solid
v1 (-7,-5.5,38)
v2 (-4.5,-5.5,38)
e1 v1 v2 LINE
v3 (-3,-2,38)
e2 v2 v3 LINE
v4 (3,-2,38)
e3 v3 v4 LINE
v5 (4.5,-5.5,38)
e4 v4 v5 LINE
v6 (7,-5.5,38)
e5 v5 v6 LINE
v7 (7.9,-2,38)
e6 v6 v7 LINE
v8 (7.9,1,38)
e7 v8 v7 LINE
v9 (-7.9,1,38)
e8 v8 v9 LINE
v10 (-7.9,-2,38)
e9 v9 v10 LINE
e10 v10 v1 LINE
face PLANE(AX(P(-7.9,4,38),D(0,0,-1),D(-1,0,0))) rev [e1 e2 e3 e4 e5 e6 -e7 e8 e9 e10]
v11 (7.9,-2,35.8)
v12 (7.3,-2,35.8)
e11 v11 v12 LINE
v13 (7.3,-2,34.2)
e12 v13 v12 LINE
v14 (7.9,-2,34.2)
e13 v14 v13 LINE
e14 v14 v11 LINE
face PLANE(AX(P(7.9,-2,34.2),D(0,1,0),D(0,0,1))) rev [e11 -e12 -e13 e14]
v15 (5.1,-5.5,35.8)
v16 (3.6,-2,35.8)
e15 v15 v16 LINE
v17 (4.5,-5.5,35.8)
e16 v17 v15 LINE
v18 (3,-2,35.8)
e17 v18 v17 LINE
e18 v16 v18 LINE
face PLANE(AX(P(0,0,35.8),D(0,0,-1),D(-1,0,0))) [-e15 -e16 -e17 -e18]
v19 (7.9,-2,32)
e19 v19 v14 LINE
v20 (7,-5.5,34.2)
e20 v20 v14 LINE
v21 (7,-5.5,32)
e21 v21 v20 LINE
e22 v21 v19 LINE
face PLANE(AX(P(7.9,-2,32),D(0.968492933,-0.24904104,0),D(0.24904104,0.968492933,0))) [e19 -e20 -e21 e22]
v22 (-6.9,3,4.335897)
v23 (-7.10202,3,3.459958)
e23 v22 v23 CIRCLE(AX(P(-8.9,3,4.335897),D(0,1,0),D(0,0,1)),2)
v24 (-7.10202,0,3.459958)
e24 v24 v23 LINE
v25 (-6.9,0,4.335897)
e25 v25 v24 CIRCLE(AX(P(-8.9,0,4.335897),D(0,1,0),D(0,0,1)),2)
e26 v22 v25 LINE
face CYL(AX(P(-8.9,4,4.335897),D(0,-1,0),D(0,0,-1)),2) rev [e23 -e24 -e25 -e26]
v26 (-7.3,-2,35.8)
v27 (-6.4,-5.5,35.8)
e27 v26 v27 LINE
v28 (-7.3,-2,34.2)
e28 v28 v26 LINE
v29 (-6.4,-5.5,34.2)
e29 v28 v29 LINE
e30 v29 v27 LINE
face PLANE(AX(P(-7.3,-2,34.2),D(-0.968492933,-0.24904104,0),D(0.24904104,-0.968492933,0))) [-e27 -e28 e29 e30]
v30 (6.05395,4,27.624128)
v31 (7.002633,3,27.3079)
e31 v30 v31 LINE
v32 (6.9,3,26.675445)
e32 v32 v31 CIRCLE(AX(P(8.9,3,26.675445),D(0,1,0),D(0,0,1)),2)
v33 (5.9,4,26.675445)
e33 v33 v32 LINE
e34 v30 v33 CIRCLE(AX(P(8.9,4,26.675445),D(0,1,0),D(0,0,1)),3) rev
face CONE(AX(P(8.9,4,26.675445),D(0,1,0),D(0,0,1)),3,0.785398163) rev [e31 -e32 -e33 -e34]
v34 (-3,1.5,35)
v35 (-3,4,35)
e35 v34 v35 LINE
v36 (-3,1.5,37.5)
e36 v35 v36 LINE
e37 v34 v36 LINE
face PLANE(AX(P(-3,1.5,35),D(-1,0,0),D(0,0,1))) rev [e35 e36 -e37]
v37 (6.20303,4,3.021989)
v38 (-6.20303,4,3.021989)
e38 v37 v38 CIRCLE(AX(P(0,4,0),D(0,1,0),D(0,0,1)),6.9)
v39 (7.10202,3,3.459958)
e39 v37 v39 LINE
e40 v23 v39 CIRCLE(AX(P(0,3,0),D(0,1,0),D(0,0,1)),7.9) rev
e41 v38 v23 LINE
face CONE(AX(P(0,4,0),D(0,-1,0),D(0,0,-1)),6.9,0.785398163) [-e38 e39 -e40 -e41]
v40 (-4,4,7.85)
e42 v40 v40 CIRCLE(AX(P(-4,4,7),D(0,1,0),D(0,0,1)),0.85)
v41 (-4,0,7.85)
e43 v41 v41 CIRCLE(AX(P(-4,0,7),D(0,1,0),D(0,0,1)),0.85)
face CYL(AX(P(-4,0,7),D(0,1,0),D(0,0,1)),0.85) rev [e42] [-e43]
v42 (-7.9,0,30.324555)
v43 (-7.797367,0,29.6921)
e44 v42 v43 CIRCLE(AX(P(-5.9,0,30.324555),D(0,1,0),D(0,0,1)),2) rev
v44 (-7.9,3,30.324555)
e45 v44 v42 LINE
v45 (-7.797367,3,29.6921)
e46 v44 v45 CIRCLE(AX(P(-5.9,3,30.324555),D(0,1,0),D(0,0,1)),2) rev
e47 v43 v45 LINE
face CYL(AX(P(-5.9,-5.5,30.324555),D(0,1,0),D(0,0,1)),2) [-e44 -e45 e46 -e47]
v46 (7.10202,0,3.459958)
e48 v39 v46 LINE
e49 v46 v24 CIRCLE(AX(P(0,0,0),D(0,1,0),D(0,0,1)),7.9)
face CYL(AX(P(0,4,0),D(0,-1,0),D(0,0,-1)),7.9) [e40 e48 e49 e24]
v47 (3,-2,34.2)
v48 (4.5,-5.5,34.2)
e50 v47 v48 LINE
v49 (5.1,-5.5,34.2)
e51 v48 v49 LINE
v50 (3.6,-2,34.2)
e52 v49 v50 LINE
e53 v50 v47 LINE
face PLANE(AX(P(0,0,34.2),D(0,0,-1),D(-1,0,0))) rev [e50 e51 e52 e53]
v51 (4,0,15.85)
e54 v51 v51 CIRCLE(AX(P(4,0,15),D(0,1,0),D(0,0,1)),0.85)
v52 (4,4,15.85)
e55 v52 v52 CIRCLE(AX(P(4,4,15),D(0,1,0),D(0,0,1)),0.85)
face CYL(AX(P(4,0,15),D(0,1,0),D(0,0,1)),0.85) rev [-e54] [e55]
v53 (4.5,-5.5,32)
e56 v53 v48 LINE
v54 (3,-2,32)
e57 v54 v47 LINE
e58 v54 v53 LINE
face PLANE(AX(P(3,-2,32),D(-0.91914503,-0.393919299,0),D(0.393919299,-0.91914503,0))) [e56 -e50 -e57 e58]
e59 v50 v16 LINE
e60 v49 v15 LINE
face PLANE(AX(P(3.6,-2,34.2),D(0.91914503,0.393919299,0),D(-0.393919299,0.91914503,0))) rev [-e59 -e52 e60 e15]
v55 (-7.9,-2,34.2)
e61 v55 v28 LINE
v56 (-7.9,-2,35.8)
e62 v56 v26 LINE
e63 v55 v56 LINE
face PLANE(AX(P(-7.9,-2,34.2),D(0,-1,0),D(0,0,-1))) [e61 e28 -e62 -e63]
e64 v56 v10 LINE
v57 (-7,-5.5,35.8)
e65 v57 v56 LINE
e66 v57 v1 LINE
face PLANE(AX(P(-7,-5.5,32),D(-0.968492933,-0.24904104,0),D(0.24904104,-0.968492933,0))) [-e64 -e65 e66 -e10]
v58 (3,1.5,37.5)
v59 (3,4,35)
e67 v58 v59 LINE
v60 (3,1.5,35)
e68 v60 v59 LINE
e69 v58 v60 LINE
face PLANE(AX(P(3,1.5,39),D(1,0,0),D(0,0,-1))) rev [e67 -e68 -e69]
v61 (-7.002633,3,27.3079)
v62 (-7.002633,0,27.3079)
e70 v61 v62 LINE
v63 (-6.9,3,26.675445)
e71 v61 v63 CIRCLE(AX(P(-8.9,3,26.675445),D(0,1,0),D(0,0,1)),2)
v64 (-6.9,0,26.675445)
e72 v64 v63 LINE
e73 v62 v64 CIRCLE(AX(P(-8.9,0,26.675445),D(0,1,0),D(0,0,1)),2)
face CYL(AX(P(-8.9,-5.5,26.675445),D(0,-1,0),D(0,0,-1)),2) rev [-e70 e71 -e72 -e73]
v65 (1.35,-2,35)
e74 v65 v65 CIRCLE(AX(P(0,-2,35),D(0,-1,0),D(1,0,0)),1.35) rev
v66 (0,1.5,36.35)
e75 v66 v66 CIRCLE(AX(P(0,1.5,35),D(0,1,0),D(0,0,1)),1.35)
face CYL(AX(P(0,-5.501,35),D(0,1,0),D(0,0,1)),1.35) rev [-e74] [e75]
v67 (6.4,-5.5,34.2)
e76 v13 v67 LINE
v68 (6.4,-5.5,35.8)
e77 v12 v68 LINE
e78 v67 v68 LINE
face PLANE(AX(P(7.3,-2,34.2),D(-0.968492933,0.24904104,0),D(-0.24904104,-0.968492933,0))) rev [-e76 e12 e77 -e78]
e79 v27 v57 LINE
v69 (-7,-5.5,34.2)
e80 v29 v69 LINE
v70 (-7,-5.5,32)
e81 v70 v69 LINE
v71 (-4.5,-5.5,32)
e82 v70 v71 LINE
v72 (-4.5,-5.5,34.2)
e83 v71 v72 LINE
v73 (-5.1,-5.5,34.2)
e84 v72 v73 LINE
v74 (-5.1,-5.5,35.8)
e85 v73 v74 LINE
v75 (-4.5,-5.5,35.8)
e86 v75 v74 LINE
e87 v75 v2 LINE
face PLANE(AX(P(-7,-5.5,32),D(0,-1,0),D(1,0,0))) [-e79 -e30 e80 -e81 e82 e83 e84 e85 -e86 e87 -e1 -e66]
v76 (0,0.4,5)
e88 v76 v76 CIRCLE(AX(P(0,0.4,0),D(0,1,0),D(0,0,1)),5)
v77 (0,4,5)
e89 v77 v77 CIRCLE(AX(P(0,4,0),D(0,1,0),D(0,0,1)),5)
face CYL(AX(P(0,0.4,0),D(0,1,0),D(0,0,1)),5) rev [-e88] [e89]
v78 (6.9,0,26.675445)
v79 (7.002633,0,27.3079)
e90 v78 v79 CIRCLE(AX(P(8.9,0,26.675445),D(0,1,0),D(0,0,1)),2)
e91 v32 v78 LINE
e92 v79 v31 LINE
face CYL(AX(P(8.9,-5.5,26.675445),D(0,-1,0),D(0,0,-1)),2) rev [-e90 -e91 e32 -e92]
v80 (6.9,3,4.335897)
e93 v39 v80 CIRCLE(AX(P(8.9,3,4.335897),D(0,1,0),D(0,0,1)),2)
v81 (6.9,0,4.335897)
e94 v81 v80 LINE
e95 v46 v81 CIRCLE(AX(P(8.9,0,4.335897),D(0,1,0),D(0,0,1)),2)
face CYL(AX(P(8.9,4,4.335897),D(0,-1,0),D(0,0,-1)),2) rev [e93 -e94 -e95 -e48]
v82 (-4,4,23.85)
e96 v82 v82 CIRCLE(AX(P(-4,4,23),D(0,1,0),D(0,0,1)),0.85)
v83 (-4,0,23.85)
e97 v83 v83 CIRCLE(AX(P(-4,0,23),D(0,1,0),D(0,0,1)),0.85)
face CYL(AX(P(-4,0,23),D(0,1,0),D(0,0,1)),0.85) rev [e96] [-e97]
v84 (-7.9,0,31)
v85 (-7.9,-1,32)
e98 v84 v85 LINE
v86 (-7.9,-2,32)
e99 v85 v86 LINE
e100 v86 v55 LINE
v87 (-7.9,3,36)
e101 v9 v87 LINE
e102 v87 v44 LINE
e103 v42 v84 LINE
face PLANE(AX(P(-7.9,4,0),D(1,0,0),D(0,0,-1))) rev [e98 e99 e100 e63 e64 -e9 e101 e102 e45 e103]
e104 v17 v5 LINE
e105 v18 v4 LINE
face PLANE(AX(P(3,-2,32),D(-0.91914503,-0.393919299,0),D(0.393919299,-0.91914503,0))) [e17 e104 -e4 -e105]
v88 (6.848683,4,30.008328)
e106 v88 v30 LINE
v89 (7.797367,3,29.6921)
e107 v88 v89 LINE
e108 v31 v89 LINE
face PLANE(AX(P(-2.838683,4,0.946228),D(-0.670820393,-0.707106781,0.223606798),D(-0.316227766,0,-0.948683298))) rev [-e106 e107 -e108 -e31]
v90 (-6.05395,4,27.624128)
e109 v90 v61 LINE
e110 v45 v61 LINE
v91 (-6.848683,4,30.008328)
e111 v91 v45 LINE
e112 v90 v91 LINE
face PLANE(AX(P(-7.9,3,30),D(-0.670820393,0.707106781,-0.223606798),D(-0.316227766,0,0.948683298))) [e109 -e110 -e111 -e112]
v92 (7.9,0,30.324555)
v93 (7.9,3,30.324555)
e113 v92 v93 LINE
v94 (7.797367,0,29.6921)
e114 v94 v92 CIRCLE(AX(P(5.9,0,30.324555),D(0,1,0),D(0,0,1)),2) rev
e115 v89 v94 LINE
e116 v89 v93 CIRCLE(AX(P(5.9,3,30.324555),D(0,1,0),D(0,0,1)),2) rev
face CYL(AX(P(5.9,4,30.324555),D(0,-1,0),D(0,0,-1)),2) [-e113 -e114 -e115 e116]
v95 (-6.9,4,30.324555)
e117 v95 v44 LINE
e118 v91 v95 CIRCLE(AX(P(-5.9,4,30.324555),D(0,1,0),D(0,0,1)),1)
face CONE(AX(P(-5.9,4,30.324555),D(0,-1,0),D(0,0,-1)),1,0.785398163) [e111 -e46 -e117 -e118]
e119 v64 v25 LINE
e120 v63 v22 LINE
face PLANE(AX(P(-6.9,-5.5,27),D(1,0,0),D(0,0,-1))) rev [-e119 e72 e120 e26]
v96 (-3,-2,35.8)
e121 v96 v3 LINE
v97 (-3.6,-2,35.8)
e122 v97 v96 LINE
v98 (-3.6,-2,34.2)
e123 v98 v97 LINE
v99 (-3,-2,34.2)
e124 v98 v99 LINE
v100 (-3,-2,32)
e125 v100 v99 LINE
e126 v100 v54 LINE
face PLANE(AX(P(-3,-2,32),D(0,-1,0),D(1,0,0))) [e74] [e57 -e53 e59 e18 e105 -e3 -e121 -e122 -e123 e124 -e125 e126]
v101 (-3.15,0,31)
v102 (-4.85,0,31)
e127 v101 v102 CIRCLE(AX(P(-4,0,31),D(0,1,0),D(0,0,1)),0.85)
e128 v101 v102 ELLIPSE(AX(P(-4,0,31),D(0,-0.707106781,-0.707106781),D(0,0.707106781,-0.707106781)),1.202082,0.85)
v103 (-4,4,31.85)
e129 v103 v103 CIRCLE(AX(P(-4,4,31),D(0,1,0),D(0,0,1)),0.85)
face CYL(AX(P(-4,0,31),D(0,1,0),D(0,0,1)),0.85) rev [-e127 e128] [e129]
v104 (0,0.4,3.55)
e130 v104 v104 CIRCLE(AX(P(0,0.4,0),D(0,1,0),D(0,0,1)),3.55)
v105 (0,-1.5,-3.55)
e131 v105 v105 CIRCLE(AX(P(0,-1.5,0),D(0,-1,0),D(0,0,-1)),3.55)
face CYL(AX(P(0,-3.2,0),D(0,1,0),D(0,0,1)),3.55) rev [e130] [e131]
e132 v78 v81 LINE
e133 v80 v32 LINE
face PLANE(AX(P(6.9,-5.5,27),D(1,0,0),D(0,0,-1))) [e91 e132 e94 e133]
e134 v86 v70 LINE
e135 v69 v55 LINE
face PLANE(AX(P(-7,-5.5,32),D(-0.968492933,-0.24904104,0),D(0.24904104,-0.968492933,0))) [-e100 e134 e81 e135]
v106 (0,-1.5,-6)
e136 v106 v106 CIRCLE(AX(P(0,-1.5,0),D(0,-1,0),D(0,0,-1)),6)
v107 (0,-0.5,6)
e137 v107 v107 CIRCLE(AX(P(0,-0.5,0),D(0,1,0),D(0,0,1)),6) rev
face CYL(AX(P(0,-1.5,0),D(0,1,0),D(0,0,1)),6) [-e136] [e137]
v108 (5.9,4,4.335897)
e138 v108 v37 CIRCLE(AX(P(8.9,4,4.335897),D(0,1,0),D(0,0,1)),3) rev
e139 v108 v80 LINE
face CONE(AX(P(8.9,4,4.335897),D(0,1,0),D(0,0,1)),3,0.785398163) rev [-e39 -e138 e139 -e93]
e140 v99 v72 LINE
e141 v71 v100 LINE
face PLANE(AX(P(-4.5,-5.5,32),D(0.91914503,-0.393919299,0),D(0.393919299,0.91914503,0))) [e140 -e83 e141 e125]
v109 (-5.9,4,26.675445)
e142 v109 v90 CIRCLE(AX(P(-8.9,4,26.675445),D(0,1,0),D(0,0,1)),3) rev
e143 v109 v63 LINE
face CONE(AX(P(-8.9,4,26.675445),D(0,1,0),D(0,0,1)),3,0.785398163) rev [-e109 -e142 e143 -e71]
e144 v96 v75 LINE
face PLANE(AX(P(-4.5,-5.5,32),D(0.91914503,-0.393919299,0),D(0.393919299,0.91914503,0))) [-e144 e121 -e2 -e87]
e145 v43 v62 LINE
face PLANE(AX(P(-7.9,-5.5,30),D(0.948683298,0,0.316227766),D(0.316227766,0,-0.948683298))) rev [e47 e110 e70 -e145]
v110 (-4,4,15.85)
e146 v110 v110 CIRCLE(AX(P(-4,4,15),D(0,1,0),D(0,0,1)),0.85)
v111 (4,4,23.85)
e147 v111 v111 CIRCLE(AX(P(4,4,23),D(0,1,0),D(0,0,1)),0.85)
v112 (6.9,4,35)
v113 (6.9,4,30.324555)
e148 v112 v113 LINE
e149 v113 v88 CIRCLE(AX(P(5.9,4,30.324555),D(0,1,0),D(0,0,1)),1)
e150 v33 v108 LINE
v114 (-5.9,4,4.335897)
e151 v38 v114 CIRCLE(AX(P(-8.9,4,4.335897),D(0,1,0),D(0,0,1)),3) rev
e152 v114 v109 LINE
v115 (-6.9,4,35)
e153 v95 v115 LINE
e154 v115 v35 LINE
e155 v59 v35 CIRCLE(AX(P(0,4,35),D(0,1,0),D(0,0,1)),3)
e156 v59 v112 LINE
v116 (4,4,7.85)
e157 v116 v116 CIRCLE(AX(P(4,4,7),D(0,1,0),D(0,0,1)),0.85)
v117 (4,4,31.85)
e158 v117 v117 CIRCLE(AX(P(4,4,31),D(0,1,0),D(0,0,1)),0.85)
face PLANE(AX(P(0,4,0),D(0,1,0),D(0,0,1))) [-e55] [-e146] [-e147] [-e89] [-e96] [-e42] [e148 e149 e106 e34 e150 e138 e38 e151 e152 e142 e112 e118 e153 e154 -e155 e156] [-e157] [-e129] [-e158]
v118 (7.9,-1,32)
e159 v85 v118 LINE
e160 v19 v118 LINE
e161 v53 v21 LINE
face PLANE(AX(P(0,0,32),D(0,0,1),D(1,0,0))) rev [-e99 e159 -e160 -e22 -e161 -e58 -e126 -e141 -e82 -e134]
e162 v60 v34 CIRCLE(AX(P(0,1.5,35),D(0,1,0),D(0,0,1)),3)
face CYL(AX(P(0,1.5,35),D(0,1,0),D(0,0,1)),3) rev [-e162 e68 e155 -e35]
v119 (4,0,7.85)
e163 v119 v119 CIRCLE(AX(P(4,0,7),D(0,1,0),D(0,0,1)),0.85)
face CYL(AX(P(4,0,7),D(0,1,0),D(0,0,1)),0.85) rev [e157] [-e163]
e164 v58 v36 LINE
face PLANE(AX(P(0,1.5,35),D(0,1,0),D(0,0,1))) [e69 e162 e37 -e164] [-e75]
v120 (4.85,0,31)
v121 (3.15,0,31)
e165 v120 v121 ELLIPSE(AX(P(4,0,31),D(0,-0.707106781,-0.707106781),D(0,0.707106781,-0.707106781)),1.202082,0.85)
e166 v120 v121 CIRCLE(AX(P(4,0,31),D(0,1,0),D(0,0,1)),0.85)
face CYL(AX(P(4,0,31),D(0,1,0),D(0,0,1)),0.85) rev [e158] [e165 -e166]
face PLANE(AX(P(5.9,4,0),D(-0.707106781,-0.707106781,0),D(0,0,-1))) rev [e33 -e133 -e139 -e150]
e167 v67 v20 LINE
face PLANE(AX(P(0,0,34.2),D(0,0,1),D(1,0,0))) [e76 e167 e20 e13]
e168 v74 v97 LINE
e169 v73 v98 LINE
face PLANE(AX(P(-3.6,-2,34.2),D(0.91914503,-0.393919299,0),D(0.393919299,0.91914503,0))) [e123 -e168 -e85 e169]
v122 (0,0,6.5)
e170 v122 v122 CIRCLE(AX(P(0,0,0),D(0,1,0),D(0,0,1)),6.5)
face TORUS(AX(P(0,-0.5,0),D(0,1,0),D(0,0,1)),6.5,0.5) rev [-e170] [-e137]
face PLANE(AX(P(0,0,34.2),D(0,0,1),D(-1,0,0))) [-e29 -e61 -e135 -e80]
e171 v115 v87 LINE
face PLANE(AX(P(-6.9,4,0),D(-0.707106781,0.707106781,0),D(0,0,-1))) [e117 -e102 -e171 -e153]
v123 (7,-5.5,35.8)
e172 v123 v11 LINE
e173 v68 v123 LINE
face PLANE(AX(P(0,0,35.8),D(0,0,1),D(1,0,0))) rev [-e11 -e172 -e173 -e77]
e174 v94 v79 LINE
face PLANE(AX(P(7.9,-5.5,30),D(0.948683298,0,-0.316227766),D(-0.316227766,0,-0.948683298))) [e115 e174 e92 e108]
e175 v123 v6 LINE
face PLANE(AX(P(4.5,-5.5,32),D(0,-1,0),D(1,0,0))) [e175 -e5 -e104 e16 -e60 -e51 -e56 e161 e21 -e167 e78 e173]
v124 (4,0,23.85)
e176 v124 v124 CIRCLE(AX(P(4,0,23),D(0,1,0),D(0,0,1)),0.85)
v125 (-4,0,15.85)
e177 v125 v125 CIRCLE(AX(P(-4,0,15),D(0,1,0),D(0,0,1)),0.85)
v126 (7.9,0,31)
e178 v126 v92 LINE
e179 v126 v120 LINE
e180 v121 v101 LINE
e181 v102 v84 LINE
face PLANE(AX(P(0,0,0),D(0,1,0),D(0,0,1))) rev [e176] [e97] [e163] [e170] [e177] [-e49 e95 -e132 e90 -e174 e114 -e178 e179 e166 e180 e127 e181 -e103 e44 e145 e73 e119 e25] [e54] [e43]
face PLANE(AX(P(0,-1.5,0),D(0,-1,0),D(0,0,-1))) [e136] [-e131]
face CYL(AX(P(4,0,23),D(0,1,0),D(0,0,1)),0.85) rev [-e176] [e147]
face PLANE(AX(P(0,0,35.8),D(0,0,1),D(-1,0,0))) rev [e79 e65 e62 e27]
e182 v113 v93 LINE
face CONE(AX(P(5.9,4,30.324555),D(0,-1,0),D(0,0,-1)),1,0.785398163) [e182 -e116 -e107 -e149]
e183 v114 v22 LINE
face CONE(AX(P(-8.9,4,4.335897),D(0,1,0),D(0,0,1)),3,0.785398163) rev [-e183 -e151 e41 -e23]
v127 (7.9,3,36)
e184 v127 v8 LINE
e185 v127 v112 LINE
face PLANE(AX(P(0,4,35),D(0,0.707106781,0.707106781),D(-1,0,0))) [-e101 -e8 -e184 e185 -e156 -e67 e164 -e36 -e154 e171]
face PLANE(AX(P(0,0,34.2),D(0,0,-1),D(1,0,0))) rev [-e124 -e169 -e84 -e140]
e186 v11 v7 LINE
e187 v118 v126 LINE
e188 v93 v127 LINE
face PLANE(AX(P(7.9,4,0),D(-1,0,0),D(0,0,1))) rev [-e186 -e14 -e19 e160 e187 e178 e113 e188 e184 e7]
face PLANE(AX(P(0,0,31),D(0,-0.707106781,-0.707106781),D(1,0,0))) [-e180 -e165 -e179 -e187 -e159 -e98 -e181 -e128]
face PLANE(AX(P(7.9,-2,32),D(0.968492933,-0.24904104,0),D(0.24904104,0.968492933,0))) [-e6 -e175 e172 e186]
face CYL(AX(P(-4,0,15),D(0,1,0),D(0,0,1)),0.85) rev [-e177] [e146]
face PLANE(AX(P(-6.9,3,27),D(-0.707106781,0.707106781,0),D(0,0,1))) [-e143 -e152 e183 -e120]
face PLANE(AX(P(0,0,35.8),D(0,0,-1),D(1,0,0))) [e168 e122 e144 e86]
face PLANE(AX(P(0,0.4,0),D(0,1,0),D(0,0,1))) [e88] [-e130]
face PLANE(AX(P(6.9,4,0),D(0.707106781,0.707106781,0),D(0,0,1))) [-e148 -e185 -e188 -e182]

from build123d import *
from build123d.topology import SkipClean

# Parameters (mm, degrees)
EXTRUDE_1_DEPTH        = 4
EXTRUDE_3_DEPTH        = 6
CHAMFER_1_SIZE         = 3
SKETCH_5_R             = 0.85
CUT_EXTRUDE_1_DEPTH    = 4
PATTERN_LINEAR_1_COUNT = 4
PATTERN_LINEAR_1_PITCH = 8
CUT_EXTRUDE_2_DEPTH    = 2.5
CUT_EXTRUDE_3_REACH    = 41.439
SKETCH_7_R             = 1.35
SKETCH_8_R             = 6
EXTRUDE_4_DEPTH        = 1.5
FILLET_1_R             = 0.5
SKETCH_9_R             = 5
CUT_EXTRUDE_4_DEPTH    = 3.6
SKETCH_10_R            = 3.55
CUT_EXTRUDE_5_DEPTH    = 3.6
CUT_EXTRUDE_6_DEPTH    = 0.8
CUT_EXTRUDE_7_DEPTH    = 40.958228189
FILLET_2_R             = 2
CHAMFER_2_SIZE         = 1


with BuildPart() as part:
    # ｽｹｯﾁ1 → ﾎﾞｽ - 押し出し1 (new body)
    with BuildSketch(Plane(origin=(0, 0, 0), x_dir=(1, 0, 0), z_dir=(0, 1, 0))):
        with BuildLine():
            Line((-7.9, 0), (-7.9, -38))
            Line((-7.9, -38), (7.9, -38))
            Line((7.9, -38), (7.9, 0))
            ThreePointArc((7.9, 0), (0, 7.9), (-7.9, 0))
        make_face()
    extrude(amount=EXTRUDE_1_DEPTH)

    # ｽｹｯﾁ4 → ﾎﾞｽ - 押し出し3 (add)
    with BuildSketch(Plane.XY.offset(38)):
        Polygon((-7, -5.5), (-4.5, -5.5), (-3, -2), (3, -2), (4.5, -5.5), (7, -5.5), (7.9, -2), (7.9, 0), (-7.9, 0), (-7.9, -2), align=None)
    extrude(amount=-EXTRUDE_3_DEPTH)

    # 面取り1
    chamfer_1_edges = [part.edges().sort_by_distance(p)[0] for p in [
        (0, 4, 38),
    ]]
    chamfer(chamfer_1_edges, length=CHAMFER_1_SIZE)

    # ｽｹｯﾁ5 → ｶｯﾄ - 押し出し1 (cut)
    with BuildSketch(Plane(origin=(0, 4, 0), x_dir=(1, 0, 0), z_dir=(0, 1, 0))):
        with Locations(Location((-4, -31, 0), (0, 0, 270))):
            Circle(SKETCH_5_R)
        with Locations(Location((4, -31, 0), (0, 0, 270))):
            Circle(SKETCH_5_R)
    cut_extrude_1 = extrude(amount=-CUT_EXTRUDE_1_DEPTH, mode=Mode.SUBTRACT)

    # 直線ﾊﾟﾀｰﾝ1: ｶｯﾄ - 押し出し1 ×4
    with Locations(*[(0, 0, -i * PATTERN_LINEAR_1_PITCH) for i in range(1, PATTERN_LINEAR_1_COUNT)]):
        add(cut_extrude_1, mode=Mode.SUBTRACT)

    # ｽｹｯﾁ6 → ｶｯﾄ - 押し出し2 (cut)
    with BuildSketch(Plane(origin=(0, 4, 0), x_dir=(1, 0, 0), z_dir=(0, 1, 0))):
        with BuildLine():
            Line((-3, -35), (-3, -39))
            Line((-3, -39), (3, -39))
            Line((3, -39), (3, -35))
            ThreePointArc((3, -35), (0, -32), (-3, -35))
        make_face()
    extrude(amount=-CUT_EXTRUDE_2_DEPTH, mode=Mode.SUBTRACT)

    # ｽｹｯﾁ7 → ｶｯﾄ - 押し出し3 (cut, up to next)
    with BuildSketch(Plane(origin=(0, 1.5, 0), x_dir=(1, 0, 0), z_dir=(0, 1, 0)), mode=Mode.PRIVATE) as cut_extrude_3_sk1:
        with Locations(Location((0, -35, 0), (0, 0, 270))):
            Circle(SKETCH_7_R)
    cut_extrude_3_tool1 = extrude(cut_extrude_3_sk1.sketch, amount=-CUT_EXTRUDE_3_REACH, mode=Mode.PRIVATE) & part.part
    add(cut_extrude_3_tool1.solids().sort_by_distance((0, 1.5, 35))[0], mode=Mode.SUBTRACT)

    # ｽｹｯﾁ8 → ﾎﾞｽ - 押し出し4 (add)
    with BuildSketch(Plane.XZ):
        with Locations(Location((0, 0, 0), (0, 0, 90))):
            Circle(SKETCH_8_R)
    extrude(amount=EXTRUDE_4_DEPTH)

    # ﾌｨﾚｯﾄ1
    fillet_1_edges = [part.edges().sort_by_distance(p)[0] for p in [
        (0, 0, -6),
    ]]
    fillet(fillet_1_edges, radius=FILLET_1_R)

    # ｽｹｯﾁ9 → ｶｯﾄ - 押し出し4 (cut)
    with BuildSketch(Plane(origin=(0, 4, 0), x_dir=(1, 0, 0), z_dir=(0, 1, 0))):
        with Locations(Location((0, 0, 0), (0, 0, 270))):
            Circle(SKETCH_9_R)
    extrude(amount=-CUT_EXTRUDE_4_DEPTH, mode=Mode.SUBTRACT)

    # ｽｹｯﾁ10 → ｶｯﾄ - 押し出し5 (cut)
    with BuildSketch(Plane(origin=(0, 0.4, 0), x_dir=(1, 0, 0), z_dir=(0, 1, 0))):
        with Locations(Location((0, 0, 0), (0, 0, 270))):
            Circle(SKETCH_10_R)
    extrude(amount=-CUT_EXTRUDE_5_DEPTH, mode=Mode.SUBTRACT)

    # ｽｹｯﾁ11 → ｶｯﾄ - 押し出し6 (cut, symmetric)
    with BuildSketch(Plane.XY.offset(35)):
        Polygon((3, -2), (4.5, -5.5), (5.1, -5.5), (3.6, -2), align=None)
        Polygon((7.9, -2), (7, -5.5), (6.4, -5.5), (7.3, -2), align=None)
    cut_extrude_6 = extrude(amount=CUT_EXTRUDE_6_DEPTH, both=True, mode=Mode.SUBTRACT)

    # ﾐﾗｰ1: ｶｯﾄ - 押し出し6 across plane
    add(cut_extrude_6.mirror(Plane(origin=(0, 0, 0), x_dir=(0, 0, 1), z_dir=(1, 0, 0))), mode=Mode.SUBTRACT)

    # ｽｹｯﾁ12 → ｶｯﾄ - 押し出し7 (cut, through all)
    with SkipClean():  # the faces are left unmerged after this step: merging them gives an invalid solid
        with BuildSketch(Plane(origin=(0, 4, 0), x_dir=(1, 0, 0), z_dir=(0, 1, 0))):
            with BuildLine():
                Line((-7.9, 0), (-7.9, -30))
                Line((-7.9, -30), (-6.9, -27))
                Line((-6.9, -27), (-6.9, -3.847076812))
                ThreePointArc((-6.9, -3.847076812), (-7.645913941, -1.987460691), (-7.9, 0))
            make_face()
        cut_extrude_7 = extrude(amount=-CUT_EXTRUDE_7_DEPTH, mode=Mode.SUBTRACT)

    # ﾐﾗｰ2: ｶｯﾄ - 押し出し7 across plane
    with SkipClean():  # the faces are left unmerged after this step: merging them gives an invalid solid
        add(cut_extrude_7.mirror(Plane(origin=(0, 0, 0), x_dir=(0, 0, 1), z_dir=(1, 0, 0))), mode=Mode.SUBTRACT)

    # ﾌｨﾚｯﾄ2
    fillet_2_edges = [part.edges().sort_by_distance(p)[0] for p in [
        (-6.9, 2, 3.847076812),
        (-6.9, 2, 27),
        (-7.9, 2, 30),
        (6.9, 2, 3.847076812),
        (7.9, 2, 30),
        (6.9, 2, 27),
    ]]
    fillet(fillet_2_edges, radius=FILLET_2_R)

    # 面取り2
    # the kernel refuses this chamfer: 1 mm, written as the material it adds along each edge
    with BuildSketch(Plane(origin=(7.9, 0, 32), x_dir=(0, 0.02749587661058639, -0.9996219169112968), z_dir=(-1, 0, 0))) as chamfer_2_piece_1_section:
        Polygon((CHAMFER_2_SIZE * 0.999621916911, CHAMFER_2_SIZE * 0.0274958766106), (-CHAMFER_2_SIZE * 0.0274958766106, CHAMFER_2_SIZE * 0.999621916911), (0, 0), align=None)
    chamfer_2_piece_1 = extrude(amount=15.8, mode=Mode.PRIVATE)
    chamfer_2_piece_1 = chamfer_2_piece_1 - Plane(origin=(-4, -0.34097177, 31), x_dir=(0, 0, 1), z_dir=(0, 1, 0)) * Cylinder(0.85, 36, mode=Mode.PRIVATE)
    chamfer_2_piece_1 = chamfer_2_piece_1 - Plane(origin=(4, -0.34097177, 31), x_dir=(0, 0, 1), z_dir=(0, 1, 0)) * Cylinder(0.85, 36, mode=Mode.PRIVATE)
    add(chamfer_2_piece_1)
    # the kernel refuses this chamfer: 1 mm, written as the material it takes off along each edge
    with BuildSketch(Plane(origin=(-7.9, 4, 30.32455532), x_dir=(-0.027495876610586487, -0.9996219169112968, 0), z_dir=(0, 0, 1)), Plane(origin=(7.9, 4, 37.571682988), x_dir=(0.027495876610586487, -0.9996219169112968, 0), z_dir=(0, 0, -1))) as chamfer_2_2_piece_1:
        Polygon((CHAMFER_2_SIZE * 0.999621916911, CHAMFER_2_SIZE * 0.0274958766106), (-CHAMFER_2_SIZE * 0.0274958766106, CHAMFER_2_SIZE * 0.999621916911), (0, 0), align=None)
    extrude(amount=7.247127668, mode=Mode.SUBTRACT)
    with BuildSketch(Plane(origin=(0, 4, 0), x_dir=(1, 0, 0), z_dir=(0, 0, 1))) as chamfer_2_2_piece_2:
        Polygon((7.9, -CHAMFER_2_SIZE), (7.9 - CHAMFER_2_SIZE, 0), (7.9, 0), align=None)
    revolve(axis=Axis((0, 4, 0), (0, 1, 0)), revolution_arc=180, mode=Mode.SUBTRACT)
    with BuildSketch(Plane(origin=(-5.9, 4, 30.32455532), x_dir=(-1, 0, 0), z_dir=(0, 0, 1))) as chamfer_2_2_piece_3:
        Polygon((2, CHAMFER_2_SIZE), (2 - CHAMFER_2_SIZE, 0), (2, 0), align=None)
    revolve(axis=Axis((-5.9, 4, 30.32455532), (0, -1, 0)), revolution_arc=18.434948823, mode=Mode.SUBTRACT)
    with BuildSketch(Plane(origin=(-7.797366596, 4, 29.692099788), x_dir=(-0.02608487890572092, -0.9996219169112968, -0.008694959635240314), z_dir=(0.3162277660168382, 0, -0.9486832980505138))) as chamfer_2_2_piece_4:
        Polygon((CHAMFER_2_SIZE * 0.999621916911, -CHAMFER_2_SIZE * 0.0274958766106), (-CHAMFER_2_SIZE * 0.0274958766106, -CHAMFER_2_SIZE * 0.999621916911), (0, 0), align=None)
    extrude(amount=2.513167019, mode=Mode.SUBTRACT)
    with BuildSketch(Plane(origin=(-8.9, 4, 26.67544468), x_dir=(0.9486832980505135, 0, 0.3162277660168389), z_dir=(-0.3162277660168389, 0, 0.9486832980505135))) as chamfer_2_2_piece_5:
        Polygon((2, -CHAMFER_2_SIZE), (2 + CHAMFER_2_SIZE, 0), (2, 0), align=None)
    revolve(axis=Axis((-8.9, 4, 26.67544468), (0, 1, 0)), revolution_arc=18.434948823, mode=Mode.SUBTRACT)
    with BuildSketch(Plane(origin=(-6.9, 4, 26.67544468), x_dir=(-0.027495876610586487, -0.9996219169112968, 0), z_dir=(0, 0, -1))) as chamfer_2_2_piece_6:
        Polygon((CHAMFER_2_SIZE * 0.999621916911, -CHAMFER_2_SIZE * 0.0274958766106), (-CHAMFER_2_SIZE * 0.0274958766106, -CHAMFER_2_SIZE * 0.999621916911), (0, 0), align=None)
    extrude(amount=22.339548002, mode=Mode.SUBTRACT)
    with BuildSketch(Plane(origin=(-8.9, 4, 4.335896678), x_dir=(1, 0, 0), z_dir=(0, 0, 1))) as chamfer_2_2_piece_7:
        Polygon((2, -CHAMFER_2_SIZE), (2 + CHAMFER_2_SIZE, 0), (2, 0), align=None)
    revolve(axis=Axis((-8.9, 4, 4.335896678), (0, 1, 0)), revolution_arc=25.974390018, mode=Mode.SUBTRACT)
    with BuildSketch(Plane(origin=(8.9, 4, 4.335896678), x_dir=(-0.8989898989898989, 0, -0.43796936138745074), z_dir=(0.43796936138745074, 0, -0.8989898989898989))) as chamfer_2_2_piece_8:
        Polygon((2, -CHAMFER_2_SIZE), (2 + CHAMFER_2_SIZE, 0), (2, 0), align=None)
    revolve(axis=Axis((8.9, 4, 4.335896678), (0, 1, 0)), revolution_arc=25.974390018, mode=Mode.SUBTRACT)
    with BuildSketch(Plane(origin=(6.9, 4, 26.67544468), x_dir=(0.027495876610586487, -0.9996219169112968, 0), z_dir=(0, 0, -1))) as chamfer_2_2_piece_9:
        Polygon((CHAMFER_2_SIZE * 0.999621916911, CHAMFER_2_SIZE * 0.0274958766106), (-CHAMFER_2_SIZE * 0.0274958766106, CHAMFER_2_SIZE * 0.999621916911), (0, 0), align=None)
    extrude(amount=22.339548002, mode=Mode.SUBTRACT)
    with BuildSketch(Plane(origin=(8.9, 4, 26.67544468), x_dir=(-1, 0, 0), z_dir=(0, 0, -1))) as chamfer_2_2_piece_10:
        Polygon((2, -CHAMFER_2_SIZE), (2 + CHAMFER_2_SIZE, 0), (2, 0), align=None)
    revolve(axis=Axis((8.9, 4, 26.67544468), (0, 1, 0)), revolution_arc=18.434948823, mode=Mode.SUBTRACT)
    with BuildSketch(Plane(origin=(7.797366596, 4, 29.692099788), x_dir=(0.02608487890572092, -0.9996219169112968, -0.008694959635240314), z_dir=(-0.3162277660168382, 0, -0.9486832980505138))) as chamfer_2_2_piece_11:
        Polygon((CHAMFER_2_SIZE * 0.999621916911, CHAMFER_2_SIZE * 0.0274958766106), (-CHAMFER_2_SIZE * 0.0274958766106, CHAMFER_2_SIZE * 0.999621916911), (0, 0), align=None)
    extrude(amount=2.513167019, mode=Mode.SUBTRACT)
    with BuildSketch(Plane(origin=(5.9, 4, 30.32455532), x_dir=(0.9486832980505135, 0, -0.3162277660168389), z_dir=(-0.3162277660168389, 0, -0.9486832980505135))) as chamfer_2_2_piece_12:
        Polygon((2, CHAMFER_2_SIZE), (2 - CHAMFER_2_SIZE, 0), (2, 0), align=None)
    revolve(axis=Axis((5.9, 4, 30.32455532), (0, -1, 0)), revolution_arc=18.434948823, mode=Mode.SUBTRACT)
    with BuildSketch(Plane(origin=(0, 4, 0), x_dir=(0.8989898989898987, 0, 0.43796936138745124), z_dir=(-0.43796936138745124, 0, 0.8989898989898987))) as chamfer_2_2_piece_13:
        Polygon((7.9, -CHAMFER_2_SIZE), (7.9 - CHAMFER_2_SIZE, 0), (7.9, 0), align=None)
    revolve(axis=Axis((0, 4, 0), (0, 1, 0)), revolution_arc=25.974390018, mode=Mode.SUBTRACT)
    with BuildSketch(Plane(origin=(0, 4, 0), x_dir=(-0.8989898989898987, 0, 0.43796936138745124), z_dir=(0.43796936138745124, 0, 0.8989898989898987))) as chamfer_2_2_piece_14:
        Polygon((7.9, CHAMFER_2_SIZE), (7.9 - CHAMFER_2_SIZE, 0), (7.9, 0), align=None)
    revolve(axis=Axis((0, 4, 0), (0, -1, 0)), revolution_arc=25.974390018, mode=Mode.SUBTRACT)


solid = part.part
